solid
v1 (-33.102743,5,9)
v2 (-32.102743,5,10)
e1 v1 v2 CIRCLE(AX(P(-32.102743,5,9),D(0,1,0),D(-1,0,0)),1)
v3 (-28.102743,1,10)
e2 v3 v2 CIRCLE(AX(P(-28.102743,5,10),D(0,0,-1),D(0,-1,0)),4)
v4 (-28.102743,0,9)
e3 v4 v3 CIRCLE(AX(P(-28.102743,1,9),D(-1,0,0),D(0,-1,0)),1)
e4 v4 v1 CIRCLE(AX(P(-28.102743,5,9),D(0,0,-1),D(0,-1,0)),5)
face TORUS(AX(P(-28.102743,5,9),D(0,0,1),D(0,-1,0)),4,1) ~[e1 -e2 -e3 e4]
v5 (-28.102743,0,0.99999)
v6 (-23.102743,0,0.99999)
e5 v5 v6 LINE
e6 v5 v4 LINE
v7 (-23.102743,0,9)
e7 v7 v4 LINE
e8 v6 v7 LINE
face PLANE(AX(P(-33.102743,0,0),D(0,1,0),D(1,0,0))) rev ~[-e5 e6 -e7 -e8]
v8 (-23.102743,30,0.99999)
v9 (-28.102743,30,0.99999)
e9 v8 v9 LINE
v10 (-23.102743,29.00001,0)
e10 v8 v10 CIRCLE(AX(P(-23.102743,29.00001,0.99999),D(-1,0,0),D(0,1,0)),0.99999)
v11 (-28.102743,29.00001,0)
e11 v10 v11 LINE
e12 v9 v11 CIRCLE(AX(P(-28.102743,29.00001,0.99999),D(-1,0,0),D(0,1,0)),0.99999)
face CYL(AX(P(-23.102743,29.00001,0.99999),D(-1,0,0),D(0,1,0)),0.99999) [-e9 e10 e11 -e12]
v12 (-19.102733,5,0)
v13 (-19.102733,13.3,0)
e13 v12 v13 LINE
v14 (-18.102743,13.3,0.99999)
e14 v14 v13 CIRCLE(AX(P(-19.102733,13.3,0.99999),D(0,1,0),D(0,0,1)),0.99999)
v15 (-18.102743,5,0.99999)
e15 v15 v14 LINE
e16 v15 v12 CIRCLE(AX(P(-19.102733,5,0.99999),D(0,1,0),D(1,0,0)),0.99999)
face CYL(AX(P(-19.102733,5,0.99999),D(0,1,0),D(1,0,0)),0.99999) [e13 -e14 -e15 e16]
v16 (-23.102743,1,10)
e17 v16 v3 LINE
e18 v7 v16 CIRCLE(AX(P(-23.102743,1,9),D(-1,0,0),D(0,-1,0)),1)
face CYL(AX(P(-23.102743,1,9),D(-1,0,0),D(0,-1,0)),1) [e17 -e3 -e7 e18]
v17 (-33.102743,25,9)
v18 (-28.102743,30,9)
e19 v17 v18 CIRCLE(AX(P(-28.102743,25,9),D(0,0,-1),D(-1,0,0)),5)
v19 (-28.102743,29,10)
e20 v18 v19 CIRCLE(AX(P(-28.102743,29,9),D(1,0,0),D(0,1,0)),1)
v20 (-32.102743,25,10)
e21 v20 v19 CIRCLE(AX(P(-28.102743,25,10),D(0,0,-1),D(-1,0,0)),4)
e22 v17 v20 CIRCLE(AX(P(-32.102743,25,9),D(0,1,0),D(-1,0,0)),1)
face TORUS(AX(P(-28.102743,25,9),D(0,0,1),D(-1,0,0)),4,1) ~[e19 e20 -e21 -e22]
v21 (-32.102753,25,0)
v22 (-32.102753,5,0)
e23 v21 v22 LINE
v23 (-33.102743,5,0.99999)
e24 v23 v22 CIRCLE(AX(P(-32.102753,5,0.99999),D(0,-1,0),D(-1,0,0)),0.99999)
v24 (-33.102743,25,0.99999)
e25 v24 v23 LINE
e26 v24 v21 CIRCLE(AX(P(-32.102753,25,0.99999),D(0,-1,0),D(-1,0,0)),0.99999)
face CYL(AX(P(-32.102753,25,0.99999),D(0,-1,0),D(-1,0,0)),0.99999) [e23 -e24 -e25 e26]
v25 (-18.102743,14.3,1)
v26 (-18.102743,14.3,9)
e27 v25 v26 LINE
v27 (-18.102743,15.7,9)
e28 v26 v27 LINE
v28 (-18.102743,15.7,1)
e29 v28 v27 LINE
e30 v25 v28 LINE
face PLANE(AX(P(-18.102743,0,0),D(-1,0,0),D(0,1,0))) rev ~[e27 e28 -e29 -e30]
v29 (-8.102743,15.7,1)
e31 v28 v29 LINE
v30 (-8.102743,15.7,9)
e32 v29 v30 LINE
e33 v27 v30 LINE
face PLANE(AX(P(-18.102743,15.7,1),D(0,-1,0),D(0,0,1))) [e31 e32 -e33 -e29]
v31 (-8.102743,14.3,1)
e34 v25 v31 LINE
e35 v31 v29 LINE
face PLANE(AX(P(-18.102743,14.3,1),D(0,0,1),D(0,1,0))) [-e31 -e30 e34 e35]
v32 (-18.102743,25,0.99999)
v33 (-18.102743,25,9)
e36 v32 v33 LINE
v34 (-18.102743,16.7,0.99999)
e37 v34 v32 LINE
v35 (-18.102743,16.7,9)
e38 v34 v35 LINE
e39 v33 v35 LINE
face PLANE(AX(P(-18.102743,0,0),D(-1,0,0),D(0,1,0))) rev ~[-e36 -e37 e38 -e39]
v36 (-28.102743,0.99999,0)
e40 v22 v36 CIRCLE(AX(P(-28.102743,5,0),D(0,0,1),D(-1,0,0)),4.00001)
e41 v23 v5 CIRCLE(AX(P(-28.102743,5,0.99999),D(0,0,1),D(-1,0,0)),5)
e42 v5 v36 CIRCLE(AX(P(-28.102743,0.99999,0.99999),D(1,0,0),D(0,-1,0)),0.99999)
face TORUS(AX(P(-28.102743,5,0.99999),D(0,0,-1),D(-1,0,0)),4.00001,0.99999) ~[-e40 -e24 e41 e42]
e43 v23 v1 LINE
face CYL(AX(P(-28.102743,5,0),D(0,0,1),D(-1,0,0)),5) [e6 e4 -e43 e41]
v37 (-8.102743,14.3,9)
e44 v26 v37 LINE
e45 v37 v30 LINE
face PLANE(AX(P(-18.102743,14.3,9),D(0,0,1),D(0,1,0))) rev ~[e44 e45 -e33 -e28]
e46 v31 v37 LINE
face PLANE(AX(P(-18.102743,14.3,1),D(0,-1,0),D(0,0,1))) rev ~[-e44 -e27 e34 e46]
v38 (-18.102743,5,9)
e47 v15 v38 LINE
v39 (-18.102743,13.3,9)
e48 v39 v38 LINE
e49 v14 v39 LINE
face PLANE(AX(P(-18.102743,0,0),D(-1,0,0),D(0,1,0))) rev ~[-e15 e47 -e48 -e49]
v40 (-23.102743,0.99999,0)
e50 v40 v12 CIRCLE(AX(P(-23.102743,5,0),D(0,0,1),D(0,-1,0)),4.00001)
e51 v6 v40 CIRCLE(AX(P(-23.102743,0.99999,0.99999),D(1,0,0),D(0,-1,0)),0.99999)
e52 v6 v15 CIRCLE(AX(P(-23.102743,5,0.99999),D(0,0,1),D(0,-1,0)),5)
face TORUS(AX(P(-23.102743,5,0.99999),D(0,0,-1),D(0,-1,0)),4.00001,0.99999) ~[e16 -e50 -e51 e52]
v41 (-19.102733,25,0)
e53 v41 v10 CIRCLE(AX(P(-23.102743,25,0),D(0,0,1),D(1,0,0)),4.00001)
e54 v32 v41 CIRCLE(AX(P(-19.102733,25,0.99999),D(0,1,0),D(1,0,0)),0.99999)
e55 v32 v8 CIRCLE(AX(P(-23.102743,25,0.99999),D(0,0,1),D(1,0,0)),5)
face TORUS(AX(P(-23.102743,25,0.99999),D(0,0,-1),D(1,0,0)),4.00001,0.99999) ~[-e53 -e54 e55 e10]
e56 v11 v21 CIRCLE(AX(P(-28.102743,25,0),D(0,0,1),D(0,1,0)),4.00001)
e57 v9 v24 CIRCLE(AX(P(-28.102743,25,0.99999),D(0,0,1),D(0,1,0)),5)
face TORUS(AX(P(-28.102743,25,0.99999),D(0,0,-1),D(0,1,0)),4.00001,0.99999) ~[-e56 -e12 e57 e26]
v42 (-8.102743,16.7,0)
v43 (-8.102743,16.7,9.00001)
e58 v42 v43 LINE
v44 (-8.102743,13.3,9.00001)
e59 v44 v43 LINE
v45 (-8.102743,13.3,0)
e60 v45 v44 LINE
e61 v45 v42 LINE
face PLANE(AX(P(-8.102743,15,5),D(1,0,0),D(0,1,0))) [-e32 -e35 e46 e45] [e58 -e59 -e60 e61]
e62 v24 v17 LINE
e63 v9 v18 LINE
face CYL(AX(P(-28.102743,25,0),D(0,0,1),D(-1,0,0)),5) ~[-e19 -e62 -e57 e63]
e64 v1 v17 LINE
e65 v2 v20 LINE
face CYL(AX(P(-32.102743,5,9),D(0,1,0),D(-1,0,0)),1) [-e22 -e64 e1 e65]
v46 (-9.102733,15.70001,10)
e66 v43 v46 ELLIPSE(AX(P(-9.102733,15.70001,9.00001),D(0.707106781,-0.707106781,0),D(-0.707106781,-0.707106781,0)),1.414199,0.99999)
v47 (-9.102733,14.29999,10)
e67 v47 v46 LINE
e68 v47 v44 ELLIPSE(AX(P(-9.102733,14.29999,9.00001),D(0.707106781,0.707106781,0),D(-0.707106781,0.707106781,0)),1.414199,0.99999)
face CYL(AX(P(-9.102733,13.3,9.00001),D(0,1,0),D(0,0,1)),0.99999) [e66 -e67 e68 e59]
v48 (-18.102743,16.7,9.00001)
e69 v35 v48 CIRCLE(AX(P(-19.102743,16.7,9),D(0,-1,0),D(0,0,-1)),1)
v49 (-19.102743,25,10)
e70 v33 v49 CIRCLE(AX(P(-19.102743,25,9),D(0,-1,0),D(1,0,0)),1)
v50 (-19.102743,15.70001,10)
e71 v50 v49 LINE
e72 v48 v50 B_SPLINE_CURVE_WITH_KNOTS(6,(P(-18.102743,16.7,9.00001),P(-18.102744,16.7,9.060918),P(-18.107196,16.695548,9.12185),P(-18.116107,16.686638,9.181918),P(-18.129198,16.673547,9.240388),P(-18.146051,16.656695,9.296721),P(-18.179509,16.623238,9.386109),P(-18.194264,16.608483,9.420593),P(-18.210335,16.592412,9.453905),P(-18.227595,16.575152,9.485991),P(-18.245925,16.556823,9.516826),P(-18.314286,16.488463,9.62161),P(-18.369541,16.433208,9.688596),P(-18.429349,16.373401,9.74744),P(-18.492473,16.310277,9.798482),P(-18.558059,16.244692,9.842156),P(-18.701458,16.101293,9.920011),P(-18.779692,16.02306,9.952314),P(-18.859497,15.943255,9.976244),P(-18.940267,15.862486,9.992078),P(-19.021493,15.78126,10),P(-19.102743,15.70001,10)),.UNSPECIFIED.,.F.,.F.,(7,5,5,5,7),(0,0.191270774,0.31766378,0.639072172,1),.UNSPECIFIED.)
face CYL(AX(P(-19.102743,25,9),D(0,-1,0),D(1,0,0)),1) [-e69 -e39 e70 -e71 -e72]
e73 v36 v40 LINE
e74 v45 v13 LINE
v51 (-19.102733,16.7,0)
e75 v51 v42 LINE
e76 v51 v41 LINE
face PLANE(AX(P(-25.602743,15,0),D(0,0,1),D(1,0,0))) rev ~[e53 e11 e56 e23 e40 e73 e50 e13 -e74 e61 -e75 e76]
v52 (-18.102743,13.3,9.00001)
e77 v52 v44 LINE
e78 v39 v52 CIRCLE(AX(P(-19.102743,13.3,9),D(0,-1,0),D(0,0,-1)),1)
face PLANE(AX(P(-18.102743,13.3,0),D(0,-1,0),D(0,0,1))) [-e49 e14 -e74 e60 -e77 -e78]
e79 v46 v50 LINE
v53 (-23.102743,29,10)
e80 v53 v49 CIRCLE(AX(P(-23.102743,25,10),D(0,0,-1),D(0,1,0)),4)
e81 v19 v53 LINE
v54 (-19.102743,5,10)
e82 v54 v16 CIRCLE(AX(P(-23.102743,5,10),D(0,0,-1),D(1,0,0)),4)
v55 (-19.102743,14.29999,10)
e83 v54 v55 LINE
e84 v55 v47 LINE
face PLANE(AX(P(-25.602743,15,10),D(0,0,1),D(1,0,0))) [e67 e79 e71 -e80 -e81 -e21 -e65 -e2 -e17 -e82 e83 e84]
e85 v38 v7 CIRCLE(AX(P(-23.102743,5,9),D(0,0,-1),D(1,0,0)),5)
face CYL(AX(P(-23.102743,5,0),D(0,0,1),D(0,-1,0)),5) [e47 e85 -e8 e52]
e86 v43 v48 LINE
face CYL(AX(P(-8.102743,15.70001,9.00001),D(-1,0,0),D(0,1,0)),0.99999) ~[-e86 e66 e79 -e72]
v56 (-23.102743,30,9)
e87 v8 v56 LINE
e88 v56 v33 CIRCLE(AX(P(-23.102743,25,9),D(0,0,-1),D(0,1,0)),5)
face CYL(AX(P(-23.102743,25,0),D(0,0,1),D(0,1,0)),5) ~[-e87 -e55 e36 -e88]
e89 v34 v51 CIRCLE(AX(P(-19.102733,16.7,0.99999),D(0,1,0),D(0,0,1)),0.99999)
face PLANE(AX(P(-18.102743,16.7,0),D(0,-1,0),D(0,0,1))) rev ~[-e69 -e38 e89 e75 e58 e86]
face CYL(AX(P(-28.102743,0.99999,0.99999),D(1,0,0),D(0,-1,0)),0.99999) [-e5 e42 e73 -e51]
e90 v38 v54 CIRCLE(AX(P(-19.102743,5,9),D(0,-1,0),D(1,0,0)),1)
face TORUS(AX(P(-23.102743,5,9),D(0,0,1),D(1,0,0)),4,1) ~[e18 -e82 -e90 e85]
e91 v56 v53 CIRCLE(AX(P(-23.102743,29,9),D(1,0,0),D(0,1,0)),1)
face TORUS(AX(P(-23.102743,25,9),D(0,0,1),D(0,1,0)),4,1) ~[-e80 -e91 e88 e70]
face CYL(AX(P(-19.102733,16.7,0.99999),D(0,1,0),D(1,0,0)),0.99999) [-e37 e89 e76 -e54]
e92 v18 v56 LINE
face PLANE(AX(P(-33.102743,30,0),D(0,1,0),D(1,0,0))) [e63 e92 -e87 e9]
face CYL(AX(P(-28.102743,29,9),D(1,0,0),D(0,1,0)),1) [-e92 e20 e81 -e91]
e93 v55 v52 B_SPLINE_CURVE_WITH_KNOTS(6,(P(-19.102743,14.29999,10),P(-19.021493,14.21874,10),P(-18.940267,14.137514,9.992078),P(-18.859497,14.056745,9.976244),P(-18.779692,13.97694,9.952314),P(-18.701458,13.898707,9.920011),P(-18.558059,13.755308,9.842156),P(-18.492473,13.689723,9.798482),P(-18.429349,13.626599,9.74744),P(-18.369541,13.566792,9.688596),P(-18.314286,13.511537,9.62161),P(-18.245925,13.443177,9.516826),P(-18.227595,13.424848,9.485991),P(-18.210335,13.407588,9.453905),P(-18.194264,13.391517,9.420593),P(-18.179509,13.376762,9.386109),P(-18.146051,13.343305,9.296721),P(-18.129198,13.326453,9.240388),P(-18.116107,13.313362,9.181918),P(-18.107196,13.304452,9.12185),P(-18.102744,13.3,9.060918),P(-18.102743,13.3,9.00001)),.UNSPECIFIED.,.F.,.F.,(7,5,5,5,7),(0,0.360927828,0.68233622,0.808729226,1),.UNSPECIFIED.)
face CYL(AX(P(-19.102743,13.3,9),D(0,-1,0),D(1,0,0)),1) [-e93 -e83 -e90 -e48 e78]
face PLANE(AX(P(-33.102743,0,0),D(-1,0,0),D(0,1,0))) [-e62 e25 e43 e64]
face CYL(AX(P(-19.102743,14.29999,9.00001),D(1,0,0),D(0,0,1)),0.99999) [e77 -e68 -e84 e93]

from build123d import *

# Parameters (mm, degrees)
F0_W     = 15
F0_H     = 30
F1_DEPTH = 10
F2_W     = 3.4
F2_H     = 10
F2_W_2   = 1.4
F2_H_2   = 8
F3_DEPTH = 10
F4_R     = 5
F5_R     = 1
F6_R     = 0.99999


# Not quite as in the source:
# - a fillet or chamfer is up to 0.001 mm smaller than in the source, because OpenCascade refuses the exact size


with BuildPart() as f1:
    # F0 (on Top) → F1 (new body)
    with BuildSketch(Plane.XY):
        with Locations((-25.6027433276, 15)):
            Rectangle(F0_W, F0_H)
    extrude(amount=F1_DEPTH)

    # F2 (on face) → F3 (join)
    with BuildSketch(Plane.YZ.offset(-18.1027433276)):
        with Locations((15, 5)):
            Rectangle(F2_W, F2_H)
        with Locations((15, 5)):
            Rectangle(F2_W_2, F2_H_2, mode=Mode.SUBTRACT)
    extrude(amount=F3_DEPTH)

    # F4
    f4_edges = [f1.edges().sort_by_distance(p)[0] for p in [
        (-18.102743, 30, 5),
        (-33.102743, 30, 5),
        (-33.102743, 0, 5),
        (-18.102743, 0, 5),
    ]]
    fillet(f4_edges, radius=F4_R)

    # F5
    f5_edges = [f1.edges().sort_by_distance(p)[0] for p in [
        (-33.102743, 15, 10),
        (-31.638277, 28.535534, 10),
        (-25.602743, 30, 10),
        (-19.567209, 28.535534, 10),
        (-18.102743, 20.85, 10),
        (-18.102743, 9.15, 10),
        (-19.567209, 1.464466, 10),
        (-25.602743, 0, 10),
        (-31.638277, 1.464466, 10),
    ]]
    fillet(f5_edges, radius=F5_R)

    # F6 (radius 1 in the source; OpenCascade refuses exactly that, so slightly less here)
    f6_edges = [f1.edges().sort_by_distance(p)[0] for p in [
        (-18.102743, 20.85, 0),
        (-18.102743, 9.15, 0),
        (-19.567209, 1.464466, 0),
        (-25.602743, 0, 0),
        (-31.638277, 1.464466, 0),
        (-33.102743, 15, 0),
        (-31.638277, 28.535534, 0),
        (-25.602743, 30, 0),
        (-19.567209, 28.535534, 0),
        (-18.602743, 16.7, 10),
        (-13.102743, 16.7, 10),
        (-19.102743, 20.85, 10),
        (-8.102743, 15, 10),
        (-20.274316, 27.828427, 10),
        (-13.102743, 13.3, 10),
        (-25.602743, 29, 10),
        (-18.602743, 13.3, 10),
        (-30.93117, 27.828427, 10),
        (-19.102743, 9.15, 10),
        (-32.102743, 15, 10),
        (-20.274316, 2.171573, 10),
        (-30.93117, 2.171573, 10),
        (-25.602743, 1, 10),
    ]]
    fillet(f6_edges, radius=F6_R)


solid = f1.part
